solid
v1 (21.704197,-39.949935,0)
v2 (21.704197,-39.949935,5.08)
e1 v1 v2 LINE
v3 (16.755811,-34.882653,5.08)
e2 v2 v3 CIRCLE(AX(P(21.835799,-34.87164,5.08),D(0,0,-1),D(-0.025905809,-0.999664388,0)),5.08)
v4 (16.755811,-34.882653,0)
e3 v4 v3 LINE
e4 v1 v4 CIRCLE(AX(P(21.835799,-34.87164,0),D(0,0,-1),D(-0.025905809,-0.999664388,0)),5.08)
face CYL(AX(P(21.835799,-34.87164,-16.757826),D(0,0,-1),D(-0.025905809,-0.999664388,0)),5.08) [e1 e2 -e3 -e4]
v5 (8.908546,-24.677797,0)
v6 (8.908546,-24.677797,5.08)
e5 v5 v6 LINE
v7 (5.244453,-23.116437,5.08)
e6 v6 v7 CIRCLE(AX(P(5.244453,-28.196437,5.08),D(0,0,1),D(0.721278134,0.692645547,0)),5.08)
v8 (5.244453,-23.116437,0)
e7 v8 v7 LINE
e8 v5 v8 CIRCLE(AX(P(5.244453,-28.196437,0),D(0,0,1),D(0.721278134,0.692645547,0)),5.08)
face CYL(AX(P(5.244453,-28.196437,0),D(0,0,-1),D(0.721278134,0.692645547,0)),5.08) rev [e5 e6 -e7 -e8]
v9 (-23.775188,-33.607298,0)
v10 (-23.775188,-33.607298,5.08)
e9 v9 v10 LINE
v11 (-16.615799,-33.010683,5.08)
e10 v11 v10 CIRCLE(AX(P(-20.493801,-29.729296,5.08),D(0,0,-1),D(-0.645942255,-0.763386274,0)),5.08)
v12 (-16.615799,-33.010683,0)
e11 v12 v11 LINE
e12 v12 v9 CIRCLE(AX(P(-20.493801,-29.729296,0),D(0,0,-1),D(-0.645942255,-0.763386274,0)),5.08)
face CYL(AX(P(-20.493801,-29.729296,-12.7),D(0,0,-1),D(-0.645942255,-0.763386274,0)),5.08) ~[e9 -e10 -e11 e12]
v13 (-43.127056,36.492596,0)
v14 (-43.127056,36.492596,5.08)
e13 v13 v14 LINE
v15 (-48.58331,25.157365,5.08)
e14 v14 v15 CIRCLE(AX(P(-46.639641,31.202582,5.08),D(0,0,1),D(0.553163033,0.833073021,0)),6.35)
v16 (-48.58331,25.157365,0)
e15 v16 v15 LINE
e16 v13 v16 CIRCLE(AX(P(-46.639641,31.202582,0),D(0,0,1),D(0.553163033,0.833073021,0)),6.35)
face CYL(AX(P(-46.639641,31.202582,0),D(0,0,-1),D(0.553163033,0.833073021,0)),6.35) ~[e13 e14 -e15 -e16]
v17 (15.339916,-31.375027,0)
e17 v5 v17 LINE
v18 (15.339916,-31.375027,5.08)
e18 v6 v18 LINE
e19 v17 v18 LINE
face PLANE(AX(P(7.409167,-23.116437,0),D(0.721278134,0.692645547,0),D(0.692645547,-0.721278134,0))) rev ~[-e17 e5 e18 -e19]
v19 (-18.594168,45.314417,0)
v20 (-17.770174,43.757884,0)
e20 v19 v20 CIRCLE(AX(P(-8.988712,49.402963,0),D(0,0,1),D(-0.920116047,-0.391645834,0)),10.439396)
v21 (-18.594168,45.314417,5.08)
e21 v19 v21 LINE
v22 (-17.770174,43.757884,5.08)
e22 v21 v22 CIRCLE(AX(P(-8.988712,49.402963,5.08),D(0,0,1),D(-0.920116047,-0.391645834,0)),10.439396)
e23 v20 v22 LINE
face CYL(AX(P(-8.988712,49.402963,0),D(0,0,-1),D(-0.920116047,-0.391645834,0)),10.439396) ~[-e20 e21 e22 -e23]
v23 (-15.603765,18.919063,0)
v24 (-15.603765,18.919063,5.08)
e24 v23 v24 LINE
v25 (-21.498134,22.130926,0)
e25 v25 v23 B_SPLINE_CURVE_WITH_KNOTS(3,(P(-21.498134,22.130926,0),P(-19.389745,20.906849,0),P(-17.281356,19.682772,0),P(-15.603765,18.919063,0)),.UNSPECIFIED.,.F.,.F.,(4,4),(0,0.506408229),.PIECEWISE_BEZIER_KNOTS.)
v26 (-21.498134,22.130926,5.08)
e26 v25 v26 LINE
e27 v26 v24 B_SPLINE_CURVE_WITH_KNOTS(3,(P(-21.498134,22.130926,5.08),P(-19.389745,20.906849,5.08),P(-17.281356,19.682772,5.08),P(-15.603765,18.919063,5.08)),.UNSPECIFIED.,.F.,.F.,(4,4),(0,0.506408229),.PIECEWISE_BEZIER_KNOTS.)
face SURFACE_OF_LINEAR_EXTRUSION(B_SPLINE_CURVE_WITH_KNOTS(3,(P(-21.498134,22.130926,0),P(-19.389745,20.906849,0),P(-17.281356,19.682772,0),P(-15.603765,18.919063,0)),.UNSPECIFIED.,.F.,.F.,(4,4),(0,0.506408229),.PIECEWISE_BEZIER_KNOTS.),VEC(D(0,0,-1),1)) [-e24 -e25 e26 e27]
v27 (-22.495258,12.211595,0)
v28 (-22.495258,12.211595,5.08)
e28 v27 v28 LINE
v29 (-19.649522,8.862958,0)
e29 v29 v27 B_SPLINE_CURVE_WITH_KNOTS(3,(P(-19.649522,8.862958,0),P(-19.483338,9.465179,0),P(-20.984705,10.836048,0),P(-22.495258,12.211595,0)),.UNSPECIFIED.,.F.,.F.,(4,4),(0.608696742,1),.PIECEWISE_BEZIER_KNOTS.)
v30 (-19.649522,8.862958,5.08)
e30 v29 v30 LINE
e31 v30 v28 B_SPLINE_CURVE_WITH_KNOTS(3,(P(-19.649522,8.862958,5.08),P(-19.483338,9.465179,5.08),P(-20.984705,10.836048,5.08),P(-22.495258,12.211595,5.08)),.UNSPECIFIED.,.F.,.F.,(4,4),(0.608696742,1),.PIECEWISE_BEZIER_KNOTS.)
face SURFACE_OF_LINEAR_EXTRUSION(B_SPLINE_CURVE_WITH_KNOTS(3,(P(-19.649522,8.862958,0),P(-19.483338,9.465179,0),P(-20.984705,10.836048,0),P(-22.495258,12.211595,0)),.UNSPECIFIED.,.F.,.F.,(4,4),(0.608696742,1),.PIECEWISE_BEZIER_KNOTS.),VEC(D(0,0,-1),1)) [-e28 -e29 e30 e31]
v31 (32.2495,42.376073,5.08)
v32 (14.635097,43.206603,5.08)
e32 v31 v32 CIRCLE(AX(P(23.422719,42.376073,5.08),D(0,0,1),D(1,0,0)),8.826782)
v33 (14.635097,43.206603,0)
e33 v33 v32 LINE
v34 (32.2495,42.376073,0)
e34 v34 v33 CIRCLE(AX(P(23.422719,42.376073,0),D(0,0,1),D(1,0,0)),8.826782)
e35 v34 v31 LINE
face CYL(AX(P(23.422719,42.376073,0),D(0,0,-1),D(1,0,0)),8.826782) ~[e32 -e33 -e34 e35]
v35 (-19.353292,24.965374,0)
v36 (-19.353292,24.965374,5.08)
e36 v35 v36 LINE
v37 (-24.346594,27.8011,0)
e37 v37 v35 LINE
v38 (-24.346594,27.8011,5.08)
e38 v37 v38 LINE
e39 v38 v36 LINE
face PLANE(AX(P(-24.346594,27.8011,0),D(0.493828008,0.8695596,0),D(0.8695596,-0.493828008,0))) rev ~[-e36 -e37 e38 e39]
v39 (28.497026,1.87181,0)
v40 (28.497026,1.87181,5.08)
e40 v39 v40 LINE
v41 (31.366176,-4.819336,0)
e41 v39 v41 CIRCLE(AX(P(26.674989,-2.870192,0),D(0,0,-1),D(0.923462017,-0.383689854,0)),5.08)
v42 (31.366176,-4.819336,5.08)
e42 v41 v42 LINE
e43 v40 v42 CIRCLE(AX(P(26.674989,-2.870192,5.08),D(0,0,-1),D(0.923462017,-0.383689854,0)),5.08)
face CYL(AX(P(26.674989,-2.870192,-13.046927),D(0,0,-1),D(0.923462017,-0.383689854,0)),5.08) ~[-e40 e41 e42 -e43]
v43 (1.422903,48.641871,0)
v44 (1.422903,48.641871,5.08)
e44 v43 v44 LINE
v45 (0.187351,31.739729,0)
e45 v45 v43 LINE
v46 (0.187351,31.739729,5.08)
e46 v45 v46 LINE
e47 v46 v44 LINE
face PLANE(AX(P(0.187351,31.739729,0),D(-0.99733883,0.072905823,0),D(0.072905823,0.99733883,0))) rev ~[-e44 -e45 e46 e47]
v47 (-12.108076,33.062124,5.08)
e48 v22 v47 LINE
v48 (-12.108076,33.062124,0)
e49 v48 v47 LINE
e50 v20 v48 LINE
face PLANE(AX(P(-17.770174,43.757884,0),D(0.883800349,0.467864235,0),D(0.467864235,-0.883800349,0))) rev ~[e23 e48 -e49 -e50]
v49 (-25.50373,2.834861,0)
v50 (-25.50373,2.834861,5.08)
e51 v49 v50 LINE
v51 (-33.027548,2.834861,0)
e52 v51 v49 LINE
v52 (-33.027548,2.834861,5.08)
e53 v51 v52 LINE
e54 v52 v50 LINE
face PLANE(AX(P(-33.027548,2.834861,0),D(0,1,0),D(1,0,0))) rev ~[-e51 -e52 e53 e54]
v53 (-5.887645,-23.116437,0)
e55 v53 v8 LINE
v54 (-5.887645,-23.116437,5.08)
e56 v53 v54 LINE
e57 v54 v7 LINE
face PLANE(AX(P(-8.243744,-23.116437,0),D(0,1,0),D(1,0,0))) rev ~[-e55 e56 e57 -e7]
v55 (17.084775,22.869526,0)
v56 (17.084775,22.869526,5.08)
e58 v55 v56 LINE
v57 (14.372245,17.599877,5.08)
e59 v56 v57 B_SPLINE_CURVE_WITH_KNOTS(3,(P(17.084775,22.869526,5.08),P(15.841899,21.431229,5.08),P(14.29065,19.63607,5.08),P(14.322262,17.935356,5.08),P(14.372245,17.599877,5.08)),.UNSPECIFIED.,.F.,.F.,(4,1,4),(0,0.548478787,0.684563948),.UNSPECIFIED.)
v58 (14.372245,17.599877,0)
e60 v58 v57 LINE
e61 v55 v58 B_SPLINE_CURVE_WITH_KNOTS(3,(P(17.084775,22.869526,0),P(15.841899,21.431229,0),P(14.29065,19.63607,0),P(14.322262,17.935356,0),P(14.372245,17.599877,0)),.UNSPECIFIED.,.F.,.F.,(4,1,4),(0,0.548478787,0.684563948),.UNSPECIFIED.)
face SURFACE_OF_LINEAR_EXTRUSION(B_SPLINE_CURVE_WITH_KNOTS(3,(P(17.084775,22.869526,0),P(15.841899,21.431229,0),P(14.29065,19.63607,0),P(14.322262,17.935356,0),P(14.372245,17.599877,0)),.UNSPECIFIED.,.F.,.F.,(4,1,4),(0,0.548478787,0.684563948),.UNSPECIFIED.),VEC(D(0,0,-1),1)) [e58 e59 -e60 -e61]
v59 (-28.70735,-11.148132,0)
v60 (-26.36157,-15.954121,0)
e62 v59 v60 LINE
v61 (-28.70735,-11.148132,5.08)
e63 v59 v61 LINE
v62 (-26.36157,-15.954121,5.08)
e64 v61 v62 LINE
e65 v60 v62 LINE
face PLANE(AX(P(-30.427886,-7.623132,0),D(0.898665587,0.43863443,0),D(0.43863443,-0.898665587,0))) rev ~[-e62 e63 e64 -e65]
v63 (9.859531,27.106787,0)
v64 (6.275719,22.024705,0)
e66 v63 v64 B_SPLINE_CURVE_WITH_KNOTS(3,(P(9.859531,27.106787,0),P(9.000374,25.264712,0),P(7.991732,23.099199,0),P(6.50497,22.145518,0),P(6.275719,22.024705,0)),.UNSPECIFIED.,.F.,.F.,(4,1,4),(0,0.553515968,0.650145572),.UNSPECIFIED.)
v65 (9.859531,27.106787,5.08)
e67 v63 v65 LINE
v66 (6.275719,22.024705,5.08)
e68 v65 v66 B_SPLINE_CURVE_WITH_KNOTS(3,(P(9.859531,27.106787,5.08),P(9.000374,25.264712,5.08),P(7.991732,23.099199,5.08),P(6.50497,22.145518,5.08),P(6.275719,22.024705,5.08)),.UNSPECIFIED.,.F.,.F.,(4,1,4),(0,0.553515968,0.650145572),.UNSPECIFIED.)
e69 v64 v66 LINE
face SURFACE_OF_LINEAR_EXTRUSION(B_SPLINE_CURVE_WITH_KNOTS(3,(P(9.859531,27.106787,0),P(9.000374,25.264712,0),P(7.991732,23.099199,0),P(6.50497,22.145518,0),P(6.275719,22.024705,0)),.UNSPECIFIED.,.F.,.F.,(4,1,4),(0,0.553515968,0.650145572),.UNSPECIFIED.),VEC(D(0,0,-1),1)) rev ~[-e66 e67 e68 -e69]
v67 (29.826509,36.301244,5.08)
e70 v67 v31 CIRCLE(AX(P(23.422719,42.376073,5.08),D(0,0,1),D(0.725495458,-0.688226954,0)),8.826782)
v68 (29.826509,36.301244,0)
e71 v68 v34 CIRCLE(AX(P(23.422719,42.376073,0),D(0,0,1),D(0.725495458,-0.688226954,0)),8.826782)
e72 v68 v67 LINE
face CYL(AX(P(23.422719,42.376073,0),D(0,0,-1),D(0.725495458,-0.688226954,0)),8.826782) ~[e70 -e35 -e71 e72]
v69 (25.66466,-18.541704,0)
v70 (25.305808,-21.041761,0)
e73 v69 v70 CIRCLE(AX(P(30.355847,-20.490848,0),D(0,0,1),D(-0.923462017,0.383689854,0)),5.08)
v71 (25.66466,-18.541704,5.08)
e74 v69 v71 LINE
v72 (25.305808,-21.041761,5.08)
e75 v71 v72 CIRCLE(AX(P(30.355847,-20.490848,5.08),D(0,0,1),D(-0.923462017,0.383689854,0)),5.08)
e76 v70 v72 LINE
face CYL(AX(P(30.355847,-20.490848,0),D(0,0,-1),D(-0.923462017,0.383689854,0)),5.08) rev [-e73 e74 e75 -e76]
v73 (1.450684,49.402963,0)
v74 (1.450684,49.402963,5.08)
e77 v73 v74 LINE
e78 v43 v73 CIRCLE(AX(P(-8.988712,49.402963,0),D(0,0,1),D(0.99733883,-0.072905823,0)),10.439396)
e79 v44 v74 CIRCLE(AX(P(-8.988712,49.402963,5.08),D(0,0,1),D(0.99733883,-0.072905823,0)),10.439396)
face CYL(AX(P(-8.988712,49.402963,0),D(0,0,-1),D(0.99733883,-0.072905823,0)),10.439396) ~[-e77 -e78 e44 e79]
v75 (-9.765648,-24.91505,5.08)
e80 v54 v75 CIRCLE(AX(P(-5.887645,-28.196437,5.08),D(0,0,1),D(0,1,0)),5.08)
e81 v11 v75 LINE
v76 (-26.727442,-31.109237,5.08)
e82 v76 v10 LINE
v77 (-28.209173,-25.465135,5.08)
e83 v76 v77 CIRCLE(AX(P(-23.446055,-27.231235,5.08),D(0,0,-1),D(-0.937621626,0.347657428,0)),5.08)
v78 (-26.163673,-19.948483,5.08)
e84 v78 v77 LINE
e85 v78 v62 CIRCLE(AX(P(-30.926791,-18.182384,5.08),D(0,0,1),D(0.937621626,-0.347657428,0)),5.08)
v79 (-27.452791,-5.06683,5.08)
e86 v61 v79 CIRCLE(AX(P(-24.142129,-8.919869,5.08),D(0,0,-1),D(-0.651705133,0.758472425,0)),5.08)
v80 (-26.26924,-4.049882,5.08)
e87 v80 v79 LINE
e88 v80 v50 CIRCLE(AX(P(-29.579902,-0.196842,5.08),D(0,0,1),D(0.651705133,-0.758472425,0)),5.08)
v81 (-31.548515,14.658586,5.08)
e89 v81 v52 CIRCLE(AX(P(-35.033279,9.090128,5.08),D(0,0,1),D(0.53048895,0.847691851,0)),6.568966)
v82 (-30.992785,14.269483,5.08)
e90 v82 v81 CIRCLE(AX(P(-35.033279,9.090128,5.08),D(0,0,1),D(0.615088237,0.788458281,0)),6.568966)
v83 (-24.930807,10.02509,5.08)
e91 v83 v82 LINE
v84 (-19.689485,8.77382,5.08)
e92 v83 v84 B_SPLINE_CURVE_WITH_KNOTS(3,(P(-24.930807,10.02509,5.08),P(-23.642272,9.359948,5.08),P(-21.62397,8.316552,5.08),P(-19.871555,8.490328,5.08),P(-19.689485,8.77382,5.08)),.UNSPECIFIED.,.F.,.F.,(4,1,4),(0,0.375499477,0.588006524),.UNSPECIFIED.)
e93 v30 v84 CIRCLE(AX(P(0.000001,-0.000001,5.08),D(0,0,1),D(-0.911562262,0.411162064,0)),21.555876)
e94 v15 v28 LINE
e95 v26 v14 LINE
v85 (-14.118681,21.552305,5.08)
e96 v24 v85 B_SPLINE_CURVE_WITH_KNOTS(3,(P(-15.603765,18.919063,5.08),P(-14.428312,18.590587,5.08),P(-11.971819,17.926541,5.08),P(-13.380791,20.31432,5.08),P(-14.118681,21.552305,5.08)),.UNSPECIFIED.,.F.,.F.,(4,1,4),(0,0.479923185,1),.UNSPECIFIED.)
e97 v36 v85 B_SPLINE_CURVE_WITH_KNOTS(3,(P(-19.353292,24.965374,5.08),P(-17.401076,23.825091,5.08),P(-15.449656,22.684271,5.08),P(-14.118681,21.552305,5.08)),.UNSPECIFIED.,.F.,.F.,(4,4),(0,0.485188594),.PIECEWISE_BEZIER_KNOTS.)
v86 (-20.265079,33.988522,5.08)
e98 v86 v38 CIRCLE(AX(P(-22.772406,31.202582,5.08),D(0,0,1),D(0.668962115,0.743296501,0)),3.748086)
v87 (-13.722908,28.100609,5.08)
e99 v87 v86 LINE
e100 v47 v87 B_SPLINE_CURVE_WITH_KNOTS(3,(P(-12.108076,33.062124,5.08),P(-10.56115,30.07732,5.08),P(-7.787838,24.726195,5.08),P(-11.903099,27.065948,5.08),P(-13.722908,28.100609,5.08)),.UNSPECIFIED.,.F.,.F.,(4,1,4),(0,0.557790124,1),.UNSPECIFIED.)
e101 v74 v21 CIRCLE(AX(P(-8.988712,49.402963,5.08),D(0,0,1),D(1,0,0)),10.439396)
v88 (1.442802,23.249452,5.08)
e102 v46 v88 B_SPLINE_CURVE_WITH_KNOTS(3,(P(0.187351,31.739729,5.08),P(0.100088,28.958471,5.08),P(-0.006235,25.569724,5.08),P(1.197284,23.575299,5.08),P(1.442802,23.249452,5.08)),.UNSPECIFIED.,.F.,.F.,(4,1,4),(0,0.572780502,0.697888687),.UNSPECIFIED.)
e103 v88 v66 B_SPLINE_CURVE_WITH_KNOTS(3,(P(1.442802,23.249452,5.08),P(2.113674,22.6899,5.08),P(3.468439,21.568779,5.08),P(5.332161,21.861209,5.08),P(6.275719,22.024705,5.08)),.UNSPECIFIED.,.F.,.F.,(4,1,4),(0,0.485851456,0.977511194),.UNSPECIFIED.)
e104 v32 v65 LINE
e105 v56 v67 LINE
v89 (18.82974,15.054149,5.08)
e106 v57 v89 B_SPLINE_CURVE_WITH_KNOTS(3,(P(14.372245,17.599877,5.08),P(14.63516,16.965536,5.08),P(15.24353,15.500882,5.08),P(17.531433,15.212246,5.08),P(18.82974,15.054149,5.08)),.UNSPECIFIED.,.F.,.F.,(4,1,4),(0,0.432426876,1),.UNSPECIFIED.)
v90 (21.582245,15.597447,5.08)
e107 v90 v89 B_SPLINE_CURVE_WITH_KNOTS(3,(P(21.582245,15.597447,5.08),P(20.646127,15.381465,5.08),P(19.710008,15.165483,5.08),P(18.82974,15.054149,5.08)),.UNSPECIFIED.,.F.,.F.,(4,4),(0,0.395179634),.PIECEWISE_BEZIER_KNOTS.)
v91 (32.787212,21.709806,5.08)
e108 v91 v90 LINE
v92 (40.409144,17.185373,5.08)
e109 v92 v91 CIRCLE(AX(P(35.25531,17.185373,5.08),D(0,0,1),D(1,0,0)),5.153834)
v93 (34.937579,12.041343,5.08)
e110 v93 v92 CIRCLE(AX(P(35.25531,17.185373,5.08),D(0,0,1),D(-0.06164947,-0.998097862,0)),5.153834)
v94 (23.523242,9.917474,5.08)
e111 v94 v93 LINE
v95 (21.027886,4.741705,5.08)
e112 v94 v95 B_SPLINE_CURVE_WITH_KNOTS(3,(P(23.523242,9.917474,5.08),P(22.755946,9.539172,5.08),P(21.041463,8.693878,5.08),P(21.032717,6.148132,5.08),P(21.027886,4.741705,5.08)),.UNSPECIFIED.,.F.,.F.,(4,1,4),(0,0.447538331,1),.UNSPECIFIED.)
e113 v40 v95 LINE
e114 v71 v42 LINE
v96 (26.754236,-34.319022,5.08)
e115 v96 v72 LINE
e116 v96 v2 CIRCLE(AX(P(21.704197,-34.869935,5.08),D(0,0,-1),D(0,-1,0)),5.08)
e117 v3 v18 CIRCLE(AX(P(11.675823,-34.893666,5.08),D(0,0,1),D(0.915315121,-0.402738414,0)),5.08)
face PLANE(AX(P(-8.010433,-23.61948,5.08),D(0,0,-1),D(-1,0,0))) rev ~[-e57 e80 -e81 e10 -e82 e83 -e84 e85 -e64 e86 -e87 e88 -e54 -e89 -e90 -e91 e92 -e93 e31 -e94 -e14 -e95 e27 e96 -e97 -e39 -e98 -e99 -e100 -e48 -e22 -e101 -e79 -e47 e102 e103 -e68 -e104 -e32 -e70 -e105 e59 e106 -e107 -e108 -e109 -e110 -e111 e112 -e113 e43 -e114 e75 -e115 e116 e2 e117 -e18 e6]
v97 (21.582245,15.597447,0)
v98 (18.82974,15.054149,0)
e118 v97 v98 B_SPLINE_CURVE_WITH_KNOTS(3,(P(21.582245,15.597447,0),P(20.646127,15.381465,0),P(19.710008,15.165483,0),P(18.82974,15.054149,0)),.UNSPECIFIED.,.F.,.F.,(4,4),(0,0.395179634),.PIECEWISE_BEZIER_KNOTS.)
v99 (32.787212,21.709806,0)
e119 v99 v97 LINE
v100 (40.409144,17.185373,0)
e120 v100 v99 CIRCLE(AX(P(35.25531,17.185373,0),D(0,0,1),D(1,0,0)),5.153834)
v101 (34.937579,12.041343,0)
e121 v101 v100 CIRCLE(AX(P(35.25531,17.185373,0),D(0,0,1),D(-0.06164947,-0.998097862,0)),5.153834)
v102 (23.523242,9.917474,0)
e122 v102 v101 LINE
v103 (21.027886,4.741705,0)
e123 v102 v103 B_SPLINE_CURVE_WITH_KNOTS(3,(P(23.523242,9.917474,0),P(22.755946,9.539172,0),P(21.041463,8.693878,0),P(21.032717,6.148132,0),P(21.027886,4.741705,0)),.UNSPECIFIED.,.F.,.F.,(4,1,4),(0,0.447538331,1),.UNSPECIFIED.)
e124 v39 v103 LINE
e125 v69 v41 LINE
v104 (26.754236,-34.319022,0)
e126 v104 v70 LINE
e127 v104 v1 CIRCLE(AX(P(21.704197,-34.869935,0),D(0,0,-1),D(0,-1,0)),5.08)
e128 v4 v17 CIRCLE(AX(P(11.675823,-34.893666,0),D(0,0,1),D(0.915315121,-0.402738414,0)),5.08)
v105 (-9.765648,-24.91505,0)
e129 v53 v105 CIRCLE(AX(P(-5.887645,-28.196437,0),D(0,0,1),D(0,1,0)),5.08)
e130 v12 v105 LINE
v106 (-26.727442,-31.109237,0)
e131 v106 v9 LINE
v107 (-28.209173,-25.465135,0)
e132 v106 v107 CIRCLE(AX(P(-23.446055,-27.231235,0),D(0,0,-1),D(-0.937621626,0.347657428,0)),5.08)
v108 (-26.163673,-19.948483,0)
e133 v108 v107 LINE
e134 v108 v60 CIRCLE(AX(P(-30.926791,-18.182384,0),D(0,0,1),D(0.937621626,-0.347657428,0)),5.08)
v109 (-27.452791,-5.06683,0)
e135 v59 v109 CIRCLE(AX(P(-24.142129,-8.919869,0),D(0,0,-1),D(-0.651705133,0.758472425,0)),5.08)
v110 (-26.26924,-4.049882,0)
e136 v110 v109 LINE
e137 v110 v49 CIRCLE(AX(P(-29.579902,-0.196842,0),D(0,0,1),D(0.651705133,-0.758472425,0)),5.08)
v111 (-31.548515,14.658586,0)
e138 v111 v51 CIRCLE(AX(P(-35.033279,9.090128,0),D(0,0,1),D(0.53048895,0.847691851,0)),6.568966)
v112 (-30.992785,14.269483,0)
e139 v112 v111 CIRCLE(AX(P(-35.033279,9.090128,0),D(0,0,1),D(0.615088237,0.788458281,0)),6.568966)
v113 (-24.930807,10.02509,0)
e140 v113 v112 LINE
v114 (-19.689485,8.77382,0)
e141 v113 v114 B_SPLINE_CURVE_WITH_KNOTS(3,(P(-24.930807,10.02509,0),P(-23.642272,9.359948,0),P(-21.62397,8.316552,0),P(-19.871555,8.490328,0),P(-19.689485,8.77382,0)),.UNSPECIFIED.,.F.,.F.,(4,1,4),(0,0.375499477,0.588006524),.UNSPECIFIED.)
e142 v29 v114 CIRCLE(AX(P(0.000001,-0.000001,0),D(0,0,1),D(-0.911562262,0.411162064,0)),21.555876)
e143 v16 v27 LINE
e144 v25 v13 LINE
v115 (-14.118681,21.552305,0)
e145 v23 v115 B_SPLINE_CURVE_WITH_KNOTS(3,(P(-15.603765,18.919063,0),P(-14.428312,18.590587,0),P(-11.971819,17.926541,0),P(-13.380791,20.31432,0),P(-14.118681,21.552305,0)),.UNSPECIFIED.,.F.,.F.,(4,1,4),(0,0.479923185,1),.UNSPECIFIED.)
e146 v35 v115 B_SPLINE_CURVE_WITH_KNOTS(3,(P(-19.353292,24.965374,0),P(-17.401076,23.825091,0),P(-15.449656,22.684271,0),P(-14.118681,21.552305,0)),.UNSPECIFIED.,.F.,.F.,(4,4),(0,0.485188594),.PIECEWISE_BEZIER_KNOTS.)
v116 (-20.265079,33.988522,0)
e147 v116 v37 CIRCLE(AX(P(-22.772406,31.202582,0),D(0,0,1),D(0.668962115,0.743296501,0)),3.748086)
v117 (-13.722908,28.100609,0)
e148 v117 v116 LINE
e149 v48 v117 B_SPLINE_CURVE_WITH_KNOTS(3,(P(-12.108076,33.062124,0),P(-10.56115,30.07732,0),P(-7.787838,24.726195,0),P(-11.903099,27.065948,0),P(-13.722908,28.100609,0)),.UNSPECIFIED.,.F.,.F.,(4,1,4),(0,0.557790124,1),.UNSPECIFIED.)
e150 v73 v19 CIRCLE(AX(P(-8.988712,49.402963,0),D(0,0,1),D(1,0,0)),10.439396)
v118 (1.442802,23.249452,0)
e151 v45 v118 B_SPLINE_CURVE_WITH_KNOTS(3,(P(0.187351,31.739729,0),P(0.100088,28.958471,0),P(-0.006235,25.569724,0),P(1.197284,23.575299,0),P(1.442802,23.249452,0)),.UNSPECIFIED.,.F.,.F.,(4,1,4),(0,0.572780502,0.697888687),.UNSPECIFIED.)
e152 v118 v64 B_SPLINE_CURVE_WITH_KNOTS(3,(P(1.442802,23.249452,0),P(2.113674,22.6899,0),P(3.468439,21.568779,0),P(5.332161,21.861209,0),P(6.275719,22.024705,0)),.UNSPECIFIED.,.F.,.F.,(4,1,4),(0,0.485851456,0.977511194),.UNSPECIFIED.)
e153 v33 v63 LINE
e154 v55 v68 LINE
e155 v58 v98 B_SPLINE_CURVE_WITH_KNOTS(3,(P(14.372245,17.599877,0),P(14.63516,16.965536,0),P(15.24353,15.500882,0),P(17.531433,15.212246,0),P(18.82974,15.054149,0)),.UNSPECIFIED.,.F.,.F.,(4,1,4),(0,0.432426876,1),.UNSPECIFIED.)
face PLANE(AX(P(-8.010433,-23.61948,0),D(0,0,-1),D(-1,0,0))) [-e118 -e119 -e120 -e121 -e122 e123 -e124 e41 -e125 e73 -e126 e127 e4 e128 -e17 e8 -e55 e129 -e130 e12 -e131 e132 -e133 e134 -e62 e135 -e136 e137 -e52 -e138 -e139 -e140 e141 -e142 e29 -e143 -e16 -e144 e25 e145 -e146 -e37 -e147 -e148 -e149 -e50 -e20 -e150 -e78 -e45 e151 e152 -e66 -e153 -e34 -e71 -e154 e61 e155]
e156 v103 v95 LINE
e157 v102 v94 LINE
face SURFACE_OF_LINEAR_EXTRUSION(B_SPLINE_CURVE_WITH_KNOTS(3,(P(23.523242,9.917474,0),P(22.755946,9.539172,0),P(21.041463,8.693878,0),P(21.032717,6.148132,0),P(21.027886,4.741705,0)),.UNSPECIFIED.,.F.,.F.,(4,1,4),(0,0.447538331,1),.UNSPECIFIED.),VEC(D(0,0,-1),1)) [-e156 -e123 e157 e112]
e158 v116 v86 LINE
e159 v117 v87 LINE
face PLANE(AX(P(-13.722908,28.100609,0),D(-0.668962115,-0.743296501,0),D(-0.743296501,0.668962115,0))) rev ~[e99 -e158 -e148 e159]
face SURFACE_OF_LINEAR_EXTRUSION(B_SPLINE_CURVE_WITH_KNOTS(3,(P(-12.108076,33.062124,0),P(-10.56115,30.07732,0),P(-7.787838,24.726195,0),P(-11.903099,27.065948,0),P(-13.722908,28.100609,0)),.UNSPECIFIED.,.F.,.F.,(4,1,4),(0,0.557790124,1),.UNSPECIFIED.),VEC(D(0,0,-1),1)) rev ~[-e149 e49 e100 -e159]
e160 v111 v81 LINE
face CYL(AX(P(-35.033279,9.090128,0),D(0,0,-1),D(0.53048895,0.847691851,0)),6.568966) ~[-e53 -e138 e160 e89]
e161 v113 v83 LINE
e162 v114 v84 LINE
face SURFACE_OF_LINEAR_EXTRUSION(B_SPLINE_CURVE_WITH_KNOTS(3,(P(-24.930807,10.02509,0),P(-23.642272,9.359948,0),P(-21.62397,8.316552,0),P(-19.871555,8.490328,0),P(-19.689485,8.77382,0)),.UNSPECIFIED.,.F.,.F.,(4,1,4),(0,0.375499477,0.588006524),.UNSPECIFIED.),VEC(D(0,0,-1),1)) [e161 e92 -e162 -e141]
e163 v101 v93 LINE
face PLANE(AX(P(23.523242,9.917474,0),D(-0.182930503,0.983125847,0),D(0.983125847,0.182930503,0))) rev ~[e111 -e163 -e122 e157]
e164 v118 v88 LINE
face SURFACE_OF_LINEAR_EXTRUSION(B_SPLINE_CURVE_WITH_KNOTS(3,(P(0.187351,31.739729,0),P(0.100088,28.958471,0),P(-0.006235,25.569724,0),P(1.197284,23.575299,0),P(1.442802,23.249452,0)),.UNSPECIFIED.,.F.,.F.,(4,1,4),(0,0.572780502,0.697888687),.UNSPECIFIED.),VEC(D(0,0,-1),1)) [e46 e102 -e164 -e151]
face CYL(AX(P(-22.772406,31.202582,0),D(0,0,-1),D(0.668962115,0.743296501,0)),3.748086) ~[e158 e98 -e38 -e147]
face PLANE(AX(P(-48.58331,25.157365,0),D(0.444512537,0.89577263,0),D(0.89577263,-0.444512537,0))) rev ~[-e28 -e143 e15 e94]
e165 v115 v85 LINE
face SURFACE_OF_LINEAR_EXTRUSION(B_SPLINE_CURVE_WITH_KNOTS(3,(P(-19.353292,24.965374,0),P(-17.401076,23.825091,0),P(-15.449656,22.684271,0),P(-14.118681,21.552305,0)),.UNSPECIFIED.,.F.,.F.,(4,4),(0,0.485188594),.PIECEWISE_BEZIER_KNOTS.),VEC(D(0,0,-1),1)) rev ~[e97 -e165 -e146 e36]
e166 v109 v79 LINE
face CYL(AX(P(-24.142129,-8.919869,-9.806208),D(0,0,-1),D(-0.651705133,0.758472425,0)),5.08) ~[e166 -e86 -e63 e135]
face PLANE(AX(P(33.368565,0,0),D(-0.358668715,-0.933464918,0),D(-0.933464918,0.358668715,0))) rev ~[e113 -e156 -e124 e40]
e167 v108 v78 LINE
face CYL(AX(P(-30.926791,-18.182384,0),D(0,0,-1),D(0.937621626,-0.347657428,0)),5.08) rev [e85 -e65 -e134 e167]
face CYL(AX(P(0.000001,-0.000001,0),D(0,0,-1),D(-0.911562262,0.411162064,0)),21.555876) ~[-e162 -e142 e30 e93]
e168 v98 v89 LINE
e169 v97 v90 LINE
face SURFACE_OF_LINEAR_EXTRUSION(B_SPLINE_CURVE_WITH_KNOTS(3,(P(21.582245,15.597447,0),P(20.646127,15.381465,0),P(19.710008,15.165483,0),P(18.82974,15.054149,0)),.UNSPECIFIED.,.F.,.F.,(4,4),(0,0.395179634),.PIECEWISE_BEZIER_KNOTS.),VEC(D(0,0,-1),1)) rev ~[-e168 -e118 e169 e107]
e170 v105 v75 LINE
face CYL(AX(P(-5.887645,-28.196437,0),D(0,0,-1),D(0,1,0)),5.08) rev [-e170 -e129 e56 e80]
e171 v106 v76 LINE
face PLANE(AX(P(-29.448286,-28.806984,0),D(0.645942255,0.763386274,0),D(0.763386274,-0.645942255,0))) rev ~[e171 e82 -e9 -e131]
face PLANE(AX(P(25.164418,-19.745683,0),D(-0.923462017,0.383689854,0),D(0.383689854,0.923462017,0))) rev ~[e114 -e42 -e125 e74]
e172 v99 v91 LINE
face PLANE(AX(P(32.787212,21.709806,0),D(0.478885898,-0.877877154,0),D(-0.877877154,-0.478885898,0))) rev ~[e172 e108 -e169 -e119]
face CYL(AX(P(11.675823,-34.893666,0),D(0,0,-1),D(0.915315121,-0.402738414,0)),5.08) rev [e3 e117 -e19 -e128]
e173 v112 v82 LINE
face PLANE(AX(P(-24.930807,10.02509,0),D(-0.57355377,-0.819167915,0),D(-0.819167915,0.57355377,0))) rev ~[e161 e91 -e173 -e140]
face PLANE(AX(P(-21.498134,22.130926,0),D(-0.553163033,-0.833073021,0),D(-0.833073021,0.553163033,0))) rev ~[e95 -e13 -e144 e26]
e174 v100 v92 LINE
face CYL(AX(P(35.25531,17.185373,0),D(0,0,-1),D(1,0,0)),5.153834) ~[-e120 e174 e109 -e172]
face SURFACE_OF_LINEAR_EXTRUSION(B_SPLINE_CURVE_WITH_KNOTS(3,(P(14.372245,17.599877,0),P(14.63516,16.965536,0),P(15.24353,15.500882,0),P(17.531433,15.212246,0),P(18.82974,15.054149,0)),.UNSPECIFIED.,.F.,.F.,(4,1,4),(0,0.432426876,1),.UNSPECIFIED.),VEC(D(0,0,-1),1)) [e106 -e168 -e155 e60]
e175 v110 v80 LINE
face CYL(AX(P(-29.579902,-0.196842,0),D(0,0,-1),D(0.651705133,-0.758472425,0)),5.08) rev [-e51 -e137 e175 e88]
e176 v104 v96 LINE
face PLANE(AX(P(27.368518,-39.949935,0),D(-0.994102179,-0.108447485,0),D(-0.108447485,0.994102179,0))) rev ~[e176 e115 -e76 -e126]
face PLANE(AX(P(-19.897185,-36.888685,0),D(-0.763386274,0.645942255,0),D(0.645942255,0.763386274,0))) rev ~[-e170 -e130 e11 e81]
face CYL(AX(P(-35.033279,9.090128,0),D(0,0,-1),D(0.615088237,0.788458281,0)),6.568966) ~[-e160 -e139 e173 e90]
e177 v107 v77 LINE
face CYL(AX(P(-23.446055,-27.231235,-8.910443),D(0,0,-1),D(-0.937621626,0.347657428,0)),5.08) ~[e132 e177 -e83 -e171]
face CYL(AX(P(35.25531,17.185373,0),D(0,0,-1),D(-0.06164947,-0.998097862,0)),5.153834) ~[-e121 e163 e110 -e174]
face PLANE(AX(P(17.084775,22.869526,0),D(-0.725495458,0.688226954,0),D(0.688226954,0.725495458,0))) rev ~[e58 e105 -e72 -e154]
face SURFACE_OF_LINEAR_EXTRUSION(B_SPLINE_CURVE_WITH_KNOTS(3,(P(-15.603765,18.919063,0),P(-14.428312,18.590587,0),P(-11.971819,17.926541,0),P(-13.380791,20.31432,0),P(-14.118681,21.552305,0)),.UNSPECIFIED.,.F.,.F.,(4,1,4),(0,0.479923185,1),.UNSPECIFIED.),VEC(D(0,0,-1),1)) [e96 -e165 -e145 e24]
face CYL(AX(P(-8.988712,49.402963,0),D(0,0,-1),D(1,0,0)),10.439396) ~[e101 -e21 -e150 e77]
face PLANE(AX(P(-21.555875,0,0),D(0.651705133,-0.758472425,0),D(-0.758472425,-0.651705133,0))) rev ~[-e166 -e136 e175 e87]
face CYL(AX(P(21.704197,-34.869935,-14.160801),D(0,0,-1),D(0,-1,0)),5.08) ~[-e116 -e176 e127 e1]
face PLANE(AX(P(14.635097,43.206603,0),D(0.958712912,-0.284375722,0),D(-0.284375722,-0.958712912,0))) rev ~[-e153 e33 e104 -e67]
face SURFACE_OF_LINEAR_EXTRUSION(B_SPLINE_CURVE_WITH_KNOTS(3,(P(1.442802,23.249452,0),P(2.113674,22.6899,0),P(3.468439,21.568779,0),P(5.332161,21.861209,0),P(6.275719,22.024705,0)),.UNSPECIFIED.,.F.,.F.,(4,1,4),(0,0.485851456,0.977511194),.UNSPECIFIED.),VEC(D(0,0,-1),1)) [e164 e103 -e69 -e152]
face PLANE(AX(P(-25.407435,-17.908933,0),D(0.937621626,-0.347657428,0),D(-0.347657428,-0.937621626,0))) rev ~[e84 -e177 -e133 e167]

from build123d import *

# Parameters (mm, degrees)
F1_DEPTH     = 5.08
F2_T1_DEPTH  = 30.48
F2_T3_DEPTH  = 33.4016018607
F2_T5_DEPTH  = 31.1738532926
F2_T7_DEPTH  = 22.9008851429
F2_T9_DEPTH  = 24.6924150926
F2_T11_DEPTH = 5.08
F3_T1_DEPTH  = 38.5956513


# Not quite as in the source:
# - a fillet or chamfer that OpenCascade refuses, or shapes differently, is made with other operations: its cross-section is extruded or revolved along the edge and cut away or added


with BuildPart() as f1:
    # F0 (on Top) → F1 (new body)
    with BuildSketch(Plane.XY):
        with BuildLine():
            ThreePointArc((-21.5558748819, 0), (0, -21.5558748819), (21.5558748819, 0))
            ThreePointArc((21.5558748819, 0), (21.4234709168, 2.3855053553), (21.0278855675, 4.7417054405))
            ThreePointArc((21.0278855675, 4.7417054405), (20.3885232844, 6.9974181101), (19.5079583491, 9.1703491196))
            ThreePointArc((19.5079583491, 9.1703491196), (18.4039292813, 11.2227950589), (17.0847745632, 13.1440564533))
            ThreePointArc((17.0847745632, 13.1440564533), (16.1728801059, 14.2510943792), (15.1893864462, 15.2950410693))
            ThreePointArc((15.1893864462, 15.2950410693), (13.7642148433, 16.5892173315), (12.2292624666, 17.7510811346))
            ThreePointArc((12.2292624666, 17.7510811346), (10.0743632522, 19.0568346529), (7.7818181976, 20.102214989))
            ThreePointArc((7.7818181976, 20.102214989), (5.7045723263, 20.7873422182), (3.5685890575, 21.2584315993))
            ThreePointArc((3.5685890575, 21.2584315993), (1.5124623044, 21.5027486546), (-0.5576198391, 21.5486612586))
            ThreePointArc((-0.5576198391, 21.5486612586), (-3.1118074322, 21.3300819602), (-5.6219845653, 20.8098301644))
            Line((-5.6219845653, 20.8098301644), (-9.4810400544, 19.3588641561))
            ThreePointArc((-9.4810400544, 19.3588641561), (-10.7139746116, 18.7047183872), (-11.9019916348, 17.972154491))
            ThreePointArc((-11.9019916348, 17.972154491), (-12.7090282155, 17.4108111167), (-13.489631919, 16.81325586))
            Line((-13.489631919, 16.81325586), (-18.8732484452, 10.4142323313))
            ThreePointArc((-18.8732484452, 10.4142323313), (-19.2769960016, 9.6464069518), (-19.6495220596, 8.8629580138))
            add(Edge.make_bspline(
                [(-19.689484951, 8.773820393), (-19.671758168, 8.8014219328), (-19.6583090598, 8.8311154874), (-19.6495220596, 8.8629580138)],
                knots=[0.5880065236, 0.5880065236, 0.5880065236, 0.5880065236, 0.6086967417, 0.6086967417, 0.6086967417, 0.6086967417], degree=3))
            ThreePointArc((-19.689484951, 8.773820393), (-20.0824369178, 7.8327178788), (-20.4304363673, 6.8740826127))
            ThreePointArc((-20.4304363673, 6.8740826127), (-20.9968993757, 4.8770850443), (-21.3686524004, 2.834860934))
            ThreePointArc((-21.3686524004, 2.834860934), (-21.5090183349, 1.4205182833), (-21.5558748819, 0))
        make_face()
        with BuildLine():
            ThreePointArc((21.0278855675, 4.7417054405), (21.4234709168, 2.3855053553), (21.5558748819, 0))
            ThreePointArc((21.5558748819, 0), (0, -21.5558748819), (-21.5558748819, 0))
            Line((-21.5558748819, 0), (-30.4278861731, -7.6231318526))
            Line((-30.4278861731, -7.6231318526), (-25.4074353725, -17.9089326411))
            Line((-25.4074353725, -17.9089326411), (-29.4482856989, -28.8069844246))
            Line((-29.4482856989, -28.8069844246), (-19.897185266, -36.8886850774))
            Line((-19.897185266, -36.8886850774), (-8.2437438999, -23.1164366785))
            Line((-8.2437438999, -23.1164366785), (7.4091665447, -23.1164366785))
            Line((7.4091665447, -23.1164366785), (17.6949668676, -33.8274315))
            Line((17.6949668676, -33.8274315), (15.0010669604, -39.9499349296))
            Line((15.0010669604, -39.9499349296), (27.3685175925, -39.9499349296))
            Line((27.3685175925, -39.9499349296), (25.1644179225, -19.7456832975))
            Line((25.1644179225, -19.7456832975), (33.3685651422, 0))
            Line((33.3685651422, 0), (21.0278855675, 4.7417054405))
        make_face()
        with BuildLine():
            ThreePointArc((19.5079583491, 9.1703491196), (20.3885232844, 6.9974181101), (21.0278855675, 4.7417054405))
            add(Edge.make_bspline(
                [(23.5232420106, 9.9174740822), (22.7559455678, 9.5391724766), (21.0414634986, 8.6938781634), (21.0327174333, 6.1481323969), (21.0278855675, 4.7417054405)],
                knots=[0, 0, 0, 0, 0.4475383305, 1, 1, 1, 1], degree=3))
            Line((23.5232420106, 9.9174740822), (19.5079583491, 9.1703491196))
        make_face()
        with BuildLine():
            add(Edge.make_bspline(
                [(-25.5037302423, 2.834860934), (-24.5160973645, 2.5129693408), (-22.6879107249, 1.9171225202), (-21.9124239812, 0.6038221422), (-21.5558748819, 0)],
                knots=[0, 0, 0, 0, 0.5402254105, 1, 1, 1, 1], degree=3))
            ThreePointArc((-21.5558748819, 0), (-21.5090183349, 1.4205182833), (-21.3686524004, 2.834860934))
            Line((-21.3686524004, 2.834860934), (-25.5037302423, 2.834860934))
        make_face()
        with BuildLine():
            ThreePointArc((17.0847745632, 13.1440564533), (18.4039292813, 11.2227950589), (19.5079583491, 9.1703491196))
            Line((19.5079583491, 9.1703491196), (23.5232420106, 9.9174740822))
            Line((23.5232420106, 9.9174740822), (34.937579099, 12.0413430014))
            ThreePointArc((34.937579099, 12.0413430014), (30.2244051694, 16.0664474688), (32.7872119933, 21.7098060121))
            Line((32.7872119933, 21.7098060121), (21.5822452322, 15.5974467356))
            Line((21.5822452322, 15.5974467356), (21.0278855675, 15.2950410693))
            Line((21.0278855675, 15.2950410693), (17.0847745632, 13.1440564533))
        make_face()
        with BuildLine():
            Line((-25.5037302423, 2.834860934), (-21.3686524004, 2.834860934))
            ThreePointArc((-21.3686524004, 2.834860934), (-20.9968993757, 4.8770850443), (-20.4304363673, 6.8740826127))
            Line((-20.4304363673, 6.8740826127), (-24.9308068167, 10.0250903474))
            Line((-24.9308068167, 10.0250903474), (-30.9927849426, 14.269483154))
            ThreePointArc((-30.9927849426, 14.269483154), (-29.1301786272, 11.9719193672), (-28.4643126696, 9.0901275345))
            ThreePointArc((-28.4643126696, 9.0901275345), (-29.7263545066, 5.2187104583), (-33.0275484153, 2.834860934))
            Line((-33.0275484153, 2.834860934), (-25.5037302423, 2.834860934))
        make_face()
        with BuildLine():
            ThreePointArc((15.1893864462, 15.2950410693), (16.1728801059, 14.2510943792), (17.0847745632, 13.1440564533))
            Line((17.0847745632, 13.1440564533), (21.0278855675, 15.2950410693))
            Line((21.0278855675, 15.2950410693), (21.5822452322, 15.5974467356))
            add(Edge.make_bspline(
                [(21.5822452322, 15.5974467356), (20.6461265257, 15.3814646696), (19.7100078192, 15.1654826036), (18.8297399827, 15.0541492613)],
                knots=[0, 0, 0, 0, 0.3951796339, 0.3951796339, 0.3951796339, 0.3951796339], degree=3))
            add(Edge.make_bspline(
                [(18.8297399827, 15.0541492613), (18.5066864561, 15.0132905279), (17.1908116294, 14.9016748686), (16.0537750645, 15.1251514978), (15.1893864462, 15.2950410693)],
                knots=[0.3951796339, 0.3951796339, 0.3951796339, 0.3951796339, 0.5402084184, 1, 1, 1, 1], degree=3))
        make_face()
        with BuildLine():
            ThreePointArc((32.7872119933, 21.7098060121), (30.2244051694, 16.0664474688), (34.937579099, 12.0413430014))
            ThreePointArc((34.937579099, 12.0413430014), (38.7854990971, 13.4304076429), (40.4091437753, 17.1853732684))
            ThreePointArc((40.4091437753, 17.1853732684), (37.8860736917, 21.6171995213), (32.7872119933, 21.7098060121))
        make_face()
        with BuildLine():
            Line((-24.9308068167, 10.0250903474), (-20.4304363673, 6.8740826127))
            ThreePointArc((-20.4304363673, 6.8740826127), (-20.0824369178, 7.8327178788), (-19.689484951, 8.773820393))
            add(Edge.make_bspline(
                [(-24.9308068167, 10.0250903474), (-23.6422724453, 9.3599481679), (-21.6239700291, 8.3165515966), (-19.8715548677, 8.4903278918), (-19.689484951, 8.773820393)],
                knots=[0, 0, 0, 0, 0.3754994773, 0.5880065236, 0.5880065236, 0.5880065236, 0.5880065236], degree=3))
        make_face()
        with BuildLine():
            ThreePointArc((-31.5485147848, 14.6585864624), (-41.5514457727, 9.9054871575), (-33.0275484153, 2.834860934))
            ThreePointArc((-33.0275484153, 2.834860934), (-29.7263545066, 5.2187104583), (-28.4643126696, 9.0901275345))
            ThreePointArc((-28.4643126696, 9.0901275345), (-29.1301786272, 11.9719193672), (-30.9927849426, 14.269483154))
            Line((-30.9927849426, 14.269483154), (-31.5485147848, 14.6585864624))
        make_face()
        with BuildLine():
            add(Edge.make_bspline(
                [(14.372244753, 17.5998769298), (14.4881018562, 16.8222590075), (14.8387441512, 16.0586500384), (15.1893864462, 15.2950410693)],
                knots=[0.6845639483, 0.6845639483, 0.6845639483, 0.6845639483, 1, 1, 1, 1], degree=3))
            add(Edge.make_bspline(
                [(18.8297399827, 15.0541492613), (18.5066864561, 15.0132905279), (17.1908116294, 14.9016748686), (16.0537750645, 15.1251514978), (15.1893864462, 15.2950410693)],
                knots=[0.3951796339, 0.3951796339, 0.3951796339, 0.3951796339, 0.5402084184, 1, 1, 1, 1], degree=3))
            add(Edge.make_bspline(
                [(14.372244753, 17.5998769298), (14.6351603968, 16.9655355449), (15.2435298304, 15.5008816531), (17.5314333381, 15.2122461299), (18.8297399827, 15.0541492613)],
                knots=[0, 0, 0, 0, 0.4324268759, 1, 1, 1, 1], degree=3))
        make_face()
        with BuildLine():
            ThreePointArc((12.2292624666, 17.7510811346), (13.7642148433, 16.5892173315), (15.1893864462, 15.2950410693))
            add(Edge.make_bspline(
                [(14.372244753, 17.5998769298), (14.4881018562, 16.8222590075), (14.8387441512, 16.0586500384), (15.1893864462, 15.2950410693)],
                knots=[0.6845639483, 0.6845639483, 0.6845639483, 0.6845639483, 1, 1, 1, 1], degree=3))
            add(Edge.make_bspline(
                [(17.0847745632, 22.8695263715), (15.8418994446, 21.4312290193), (14.2906498457, 19.6360702318), (14.3222617771, 17.9353562123), (14.372244753, 17.5998769298)],
                knots=[0, 0, 0, 0, 0.548478787, 0.6845639483, 0.6845639483, 0.6845639483, 0.6845639483], degree=3))
            Line((17.0847745632, 22.8695263715), (12.2292624666, 17.7510811346))
        make_face()
        with BuildLine():
            ThreePointArc((-19.6495220596, 8.8629580138), (-19.6695539991, 8.8184118412), (-19.689484951, 8.773820393))
            add(Edge.make_bspline(
                [(-19.689484951, 8.773820393), (-19.671758168, 8.8014219328), (-19.6583090598, 8.8311154874), (-19.6495220596, 8.8629580138)],
                knots=[0.5880065236, 0.5880065236, 0.5880065236, 0.5880065236, 0.6086967417, 0.6086967417, 0.6086967417, 0.6086967417], degree=3))
        make_face()
        with BuildLine():
            ThreePointArc((-30.9927849426, 14.269483154), (-31.2656234469, 14.4712136982), (-31.5485147848, 14.6585864624))
            Line((-31.5485147848, 14.6585864624), (-30.9927849426, 14.269483154))
        make_face()
        with BuildLine():
            ThreePointArc((7.7818181976, 20.102214989), (10.0743632522, 19.0568346529), (12.2292624666, 17.7510811346))
            Line((12.2292624666, 17.7510811346), (17.0847745632, 22.8695263715))
            Line((17.0847745632, 22.8695263715), (29.8265086684, 36.3012441684))
            ThreePointArc((29.8265086684, 36.3012441684), (19.7700953097, 34.3405012918), (14.6350970936, 43.2066027795))
            Line((14.6350970936, 43.2066027795), (9.8595311749, 27.1067871176))
            Line((9.8595311749, 27.1067871176), (7.7818181976, 20.102214989))
        make_face()
        with BuildLine():
            add(Edge.make_bspline(
                [(-19.6495220596, 8.8629580138), (-19.4833381268, 9.4651790358), (-20.9847051533, 10.8360480358), (-22.495258138, 12.2115954812)],
                knots=[0.6086967417, 0.6086967417, 0.6086967417, 0.6086967417, 1, 1, 1, 1], degree=3))
            ThreePointArc((-19.6495220596, 8.8629580138), (-19.2769960016, 9.6464069518), (-18.8732484452, 10.4142323313))
            Line((-18.8732484452, 10.4142323313), (-22.495258138, 12.2115954812))
        make_face()
        with BuildLine():
            ThreePointArc((3.5685890575, 21.2584315993), (5.7045723263, 20.7873422182), (7.7818181976, 20.102214989))
            Line((7.7818181976, 20.102214989), (9.8595311749, 27.1067871176))
            add(Edge.make_bspline(
                [(9.8595311749, 27.1067871176), (9.0003739191, 25.2647119406), (7.9917320333, 23.0991990151), (6.5049700197, 22.1455177099), (6.2757189942, 22.0247046239)],
                knots=[0, 0, 0, 0, 0.553515968, 0.6501455724, 0.6501455724, 0.6501455724, 0.6501455724], degree=3))
            add(Edge.make_bspline(
                [(6.2757189942, 22.0247046239), (5.4456991801, 21.5872921634), (4.5071787847, 21.424245643), (3.5685890575, 21.2584315993)],
                knots=[0.6501455724, 0.6501455724, 0.6501455724, 0.6501455724, 1, 1, 1, 1], degree=3))
        make_face()
        with BuildLine():
            Line((-22.495258138, 12.2115954812), (-18.8732484452, 10.4142323313))
            ThreePointArc((-18.8732484452, 10.4142323313), (-16.49472285, 13.8773145827), (-13.489631919, 16.81325586))
            Line((-13.489631919, 16.81325586), (-21.4981341047, 22.1309257933))
            Line((-21.4981341047, 22.1309257933), (-43.1270560205, 36.4925960649))
            ThreePointArc((-43.1270560205, 36.4925960649), (-41.0437760026, 34.2040473217), (-40.2896412796, 31.2025823789))
            ThreePointArc((-40.2896412796, 31.2025823789), (-42.8993068164, 26.0710720648), (-48.5833099737, 25.1573650952))
            Line((-48.5833099737, 25.1573650952), (-22.495258138, 12.2115954812))
        make_face()
        with BuildLine():
            add(Edge.make_bspline(
                [(1.4428020951, 23.2494519066), (2.0356785994, 22.4625958954), (2.8021338285, 21.8605137474), (3.5685890575, 21.2584315993)],
                knots=[0.6978886874, 0.6978886874, 0.6978886874, 0.6978886874, 1, 1, 1, 1], degree=3))
            add(Edge.make_bspline(
                [(6.2757189942, 22.0247046239), (5.4456991801, 21.5872921634), (4.5071787847, 21.424245643), (3.5685890575, 21.2584315993)],
                knots=[0.6501455724, 0.6501455724, 0.6501455724, 0.6501455724, 1, 1, 1, 1], degree=3))
            add(Edge.make_bspline(
                [(1.4428020951, 23.2494519066), (2.1136741264, 22.6899001143), (3.4684392223, 21.5687785752), (5.3321614448, 21.8612087878), (6.2757189942, 22.0247046239)],
                knots=[0, 0, 0, 0, 0.4858514557, 0.9775111942, 0.9775111942, 0.9775111942, 0.9775111942], degree=3))
        make_face()
        with BuildLine():
            ThreePointArc((-0.5576198391, 21.5486612586), (1.5124623044, 21.5027486546), (3.5685890575, 21.2584315993))
            add(Edge.make_bspline(
                [(1.4428020951, 23.2494519066), (2.0356785994, 22.4625958954), (2.8021338285, 21.8605137474), (3.5685890575, 21.2584315993)],
                knots=[0.6978886874, 0.6978886874, 0.6978886874, 0.6978886874, 1, 1, 1, 1], degree=3))
            add(Edge.make_bspline(
                [(0.1873508122, 31.7397286266), (0.1000880741, 28.9584711756), (-0.0062348151, 25.5697243407), (1.1972842983, 23.5752991157), (1.4428020951, 23.2494519066)],
                knots=[0, 0, 0, 0, 0.5727805016, 0.6978886874, 0.6978886874, 0.6978886874, 0.6978886874], degree=3))
            Line((0.1873508122, 31.7397286266), (-0.5576198391, 21.5486612586))
        make_face()
        with BuildLine():
            ThreePointArc((14.6350970936, 43.2066027795), (19.7700953097, 34.3405012918), (29.8265086684, 36.3012441684))
            ThreePointArc((29.8265086684, 36.3012441684), (31.6214054529, 39.1059647688), (32.2495003028, 42.3760731726))
            ThreePointArc((32.2495003028, 42.3760731726), (23.8384448664, 51.1930593335), (14.6350970936, 43.2066027795))
        make_face()
        with BuildLine():
            Line((-21.4981341047, 22.1309257933), (-13.489631919, 16.81325586))
            ThreePointArc((-13.489631919, 16.81325586), (-12.7090282155, 17.4108111167), (-11.9019916348, 17.972154491))
            add(Edge.make_bspline(
                [(-15.6037653952, 18.9190625193), (-15.1517196516, 18.7132722351), (-13.629732374, 18.0898022553), (-12.6272962109, 18.0215429553), (-11.9019916348, 17.972154491)],
                knots=[0.5064082285, 0.5064082285, 0.5064082285, 0.5064082285, 0.6428656669, 1, 1, 1, 1], degree=3))
            add(Edge.make_bspline(
                [(-21.4981341047, 22.1309257933), (-19.3897449339, 20.9068490942), (-17.2813557631, 19.682772395), (-15.6037653952, 18.9190625193)],
                knots=[0, 0, 0, 0, 0.5064082285, 0.5064082285, 0.5064082285, 0.5064082285], degree=3))
        make_face()
        with BuildLine():
            ThreePointArc((-43.1270560205, 36.4925960649), (-52.3612879028, 33.9567174372), (-48.5833099737, 25.1573650952))
            ThreePointArc((-48.5833099737, 25.1573650952), (-42.8993068164, 26.0710720648), (-40.2896412796, 31.2025823789))
            ThreePointArc((-40.2896412796, 31.2025823789), (-41.0437760026, 34.2040473217), (-43.1270560205, 36.4925960649))
        make_face()
        with BuildLine():
            ThreePointArc((-5.6219845653, 20.8098301644), (-3.1118074322, 21.3300819602), (-0.5576198391, 21.5486612586))
            Line((-0.5576198391, 21.5486612586), (0.1873508122, 31.7397286266))
            Line((0.1873508122, 31.7397286266), (1.4229034066, 48.6418706156))
            ThreePointArc((1.4229034066, 48.6418706156), (-6.4142835546, 39.2859820381), (-17.7701736912, 43.7578842893))
            Line((-17.7701736912, 43.7578842893), (-12.108076115, 33.0621237696))
            Line((-12.108076115, 33.0621237696), (-5.6219845653, 20.8098301644))
        make_face()
        with BuildLine():
            add(Edge.make_bspline(
                [(-14.1186807086, 21.5523049049), (-13.7674127143, 21.2535588061), (-12.528919888, 20.0549599754), (-12.1730615765, 18.869117359), (-11.9019916348, 17.972154491)],
                knots=[0.4851885937, 0.4851885937, 0.4851885937, 0.4851885937, 0.6132384939, 1, 1, 1, 1], degree=3))
            ThreePointArc((-11.9019916348, 17.972154491), (-10.7139746116, 18.7047183872), (-9.4810400544, 19.3588641561))
            Line((-9.4810400544, 19.3588641561), (-19.3532919722, 24.9653740527))
            add(Edge.make_bspline(
                [(-19.3532919722, 24.9653740527), (-17.4010758423, 23.8250906074), (-15.4496557731, 22.6842714218), (-14.1186807086, 21.5523049049)],
                knots=[0, 0, 0, 0, 0.4851885937, 0.4851885937, 0.4851885937, 0.4851885937], degree=3))
        make_face()
        with BuildLine():
            add(Edge.make_bspline(
                [(-15.6037653952, 18.9190625193), (-15.1517196516, 18.7132722351), (-13.629732374, 18.0898022553), (-12.6272962109, 18.0215429553), (-11.9019916348, 17.972154491)],
                knots=[0.5064082285, 0.5064082285, 0.5064082285, 0.5064082285, 0.6428656669, 1, 1, 1, 1], degree=3))
            add(Edge.make_bspline(
                [(-14.1186807086, 21.5523049049), (-13.7674127143, 21.2535588061), (-12.528919888, 20.0549599754), (-12.1730615765, 18.869117359), (-11.9019916348, 17.972154491)],
                knots=[0.4851885937, 0.4851885937, 0.4851885937, 0.4851885937, 0.6132384939, 1, 1, 1, 1], degree=3))
            add(Edge.make_bspline(
                [(-15.6037653952, 18.9190625193), (-14.4283120532, 18.5905868682), (-11.9718187149, 17.9265406092), (-13.3807906918, 20.3143200715), (-14.1186807086, 21.5523049049)],
                knots=[0, 0, 0, 0, 0.4799231847, 1, 1, 1, 1], degree=3))
        make_face()
        with BuildLine():
            ThreePointArc((-9.4810400544, 19.3588641561), (-7.5862812863, 20.1768203186), (-5.6219845653, 20.8098301644))
            Line((-5.6219845653, 20.8098301644), (-13.7229076454, 28.1006093155))
            Line((-13.7229076454, 28.1006093155), (-20.2650786975, 33.9885215741))
            ThreePointArc((-20.2650786975, 33.9885215741), (-19.348532067, 32.7274543218), (-19.0243201626, 31.2025822021))
            ThreePointArc((-19.0243201626, 31.2025822021), (-20.7539962478, 28.0443911329), (-24.3465941192, 27.8010996944))
            Line((-24.3465941192, 27.8010996944), (-19.3532919722, 24.9653740527))
            Line((-19.3532919722, 24.9653740527), (-9.4810400544, 19.3588641561))
        make_face()
        with BuildLine():
            Line((-13.7229076454, 28.1006093155), (-5.6219845653, 20.8098301644))
            Line((-5.6219845653, 20.8098301644), (-12.108076115, 33.0621237696))
            add(Edge.make_bspline(
                [(-12.108076115, 33.0621237696), (-10.5611501023, 30.0773195503), (-7.7878381604, 24.7261953741), (-11.9030987649, 27.065947721), (-13.7229076454, 28.1006093155)],
                knots=[0, 0, 0, 0, 0.5577901243, 1, 1, 1, 1], degree=3))
        make_face()
        with BuildLine():
            ThreePointArc((-17.7701736912, 43.7578842893), (-6.4142835546, 39.2859820381), (1.4229034066, 48.6418706156))
            ThreePointArc((1.4229034066, 48.6418706156), (1.4437368542, 49.022163574), (1.4506844192, 49.4029633877))
            ThreePointArc((1.4506844192, 49.4029633877), (-11.0750760863, 59.6317500163), (-18.5941676648, 45.3144173747))
            Line((-18.5941676648, 45.3144173747), (-17.7701736912, 43.7578842893))
        make_face()
        with BuildLine():
            ThreePointArc((-19.0243201626, 31.2025822021), (-19.348532067, 32.7274543218), (-20.2650786975, 33.9885215741))
            ThreePointArc((-20.2650786975, 33.9885215741), (-25.9011017814, 33.2664173148), (-24.3465941192, 27.8010996944))
            ThreePointArc((-24.3465941192, 27.8010996944), (-20.7539962478, 28.0443911329), (-19.0243201626, 31.2025822021))
        make_face()
        with BuildLine():
            ThreePointArc((-18.5941676648, 45.3144173747), (-18.215053705, 44.5187432893), (-17.7701736912, 43.7578842893))
            Line((-17.7701736912, 43.7578842893), (-18.5941676648, 45.3144173747))
        make_face()
        with BuildLine():
            ThreePointArc((-13.489631919, 16.81325586), (-16.49472285, 13.8773145827), (-18.8732484452, 10.4142323313))
            Line((-18.8732484452, 10.4142323313), (-13.489631919, 16.81325586))
        make_face()
        with BuildLine():
            Line((-9.4810400544, 19.3588641561), (-5.6219845653, 20.8098301644))
            ThreePointArc((-5.6219845653, 20.8098301644), (-7.5862812863, 20.1768203186), (-9.4810400544, 19.3588641561))
        make_face()
    extrude(amount=F1_DEPTH)

    # F2: fillet of radius 5.08 on 11 edges, made by hand

    # F2_s2 → F2_t1 (cut)
    with BuildSketch(Plane.XY.offset(-12.7)):
        with BuildLine():
            ThreePointArc((-23.7751875383, -33.607298423), (-20.0719299347, -34.7917486099), (-16.6157986116, -33.0106828051))
            Line((-16.6157986116, -33.0106828051), (-16.5382385661, -33.0763105382))
            Line((-16.5382385661, -33.0763105382), (-19.8852529537, -37.031872856))
            Line((-19.8852529537, -37.031872856), (-23.8408152714, -33.6848584684))
            Line((-23.8408152714, -33.6848584684), (-23.7751875383, -33.607298423))
        make_face()
    extrude(amount=F2_T1_DEPTH, mode=Mode.SUBTRACT)

    # F2_s4 → F2_t3 (cut)
    with BuildSketch(Plane.XY.offset(-14.1608009303)):
        with BuildLine():
            ThreePointArc((21.7041972204, -39.9499349296), (25.4860644305, -38.2616720075), (26.7542362913, -34.3190217034))
            Line((26.7542362913, -34.3190217034), (26.8552370727, -34.3080034389))
            Line((26.8552370727, -34.3080034389), (27.481804, -40.0515349296))
            Line((27.481804, -40.0515349296), (21.7041972204, -40.0515349296))
            Line((21.7041972204, -40.0515349296), (21.7041972204, -39.9499349296))
        make_face()
    extrude(amount=F2_T3_DEPTH, mode=Mode.SUBTRACT)

    # F2_s6 → F2_t5 (cut)
    with BuildSketch(Plane.XY.offset(-13.0469266463)):
        with BuildLine():
            ThreePointArc((31.3661757916, -4.8193364766), (31.3438624437, -0.8681884219), (28.4970258172, 1.8718097639))
            Line((28.4970258172, 1.8718097639), (28.5334665587, 1.9666497995))
            Line((28.5334665587, 1.9666497995), (33.5024366701, 0.0574038404))
            Line((33.5024366701, 0.0574038404), (31.4599995324, -4.8583193657))
            Line((31.4599995324, -4.8583193657), (31.3661757916, -4.8193364766))
        make_face()
    extrude(amount=F2_T5_DEPTH, mode=Mode.SUBTRACT)

    # F2_s8 → F2_t7 (cut)
    with BuildSketch(Plane.XY.offset(-8.9104425714)):
        with BuildLine():
            ThreePointArc((-28.2091730806, -25.465134965), (-28.3595555101, -28.5211629615), (-26.7274418769, -31.109236971))
            Line((-26.7274418769, -31.109236971), (-26.79306961, -31.1867970164))
            Line((-26.79306961, -31.1867970164), (-29.5683303084, -28.8384994191))
            Line((-29.5683303084, -28.8384994191), (-28.3044354378, -25.4298129704))
            Line((-28.3044354378, -25.4298129704), (-28.2091730806, -25.465134965))
        make_face()
    extrude(amount=F2_T7_DEPTH, mode=Mode.SUBTRACT)

    # F2_s10 → F2_t9 (cut)
    with BuildSketch(Plane.XY.offset(-9.8062075463)):
        with BuildLine():
            ThreePointArc((-27.4527909667, -5.0668295342), (-29.1173620778, -7.8934900279), (-28.7073500706, -11.1481323562))
            Line((-28.7073500706, -11.1481323562), (-28.7986544942, -11.1926976143))
            Line((-28.7986544942, -11.1926976143), (-30.5536013188, -7.5971971006))
            Line((-30.5536013188, -7.5971971006), (-27.5190042082, -4.9897687358))
            Line((-27.5190042082, -4.9897687358), (-27.4527909667, -5.0668295342))
        make_face()
    extrude(amount=F2_T9_DEPTH, mode=Mode.SUBTRACT)

    # F2_s12 → F2_t11 (join)
    with BuildSketch(Plane.XY):
        with BuildLine():
            ThreePointArc((-5.8876452816, -23.1164366785), (-8.0250450799, -23.587974668), (-9.7656475539, -24.915050024))
            Line((-9.7656475539, -24.915050024), (-9.8432075993, -24.8494222909))
            Line((-9.8432075993, -24.8494222909), (-8.2908658722, -23.0148366785))
            Line((-8.2908658722, -23.0148366785), (-5.8876452816, -23.0148366785))
            Line((-5.8876452816, -23.0148366785), (-5.8876452816, -23.1164366785))
        make_face()
        with BuildLine():
            ThreePointArc((8.9085458148, -24.6777973012), (7.2358985953, -23.523049896), (5.2444528939, -23.1164366785))
            Line((5.2444528939, -23.1164366785), (5.2444528939, -23.0148366785))
            Line((5.2444528939, -23.0148366785), (7.4524608177, -23.0148366785))
            Line((7.4524608177, -23.0148366785), (8.9818276732, -24.6074245137))
            Line((8.9818276732, -24.6074245137), (8.9085458148, -24.6777973012))
        make_face()
        with BuildLine():
            ThreePointArc((25.6646602449, -18.5417036265), (25.3273839394, -19.7690750319), (25.3058082185, -21.0417613096))
            Line((25.3058082185, -21.0417613096), (25.2048074371, -21.0527795742))
            Line((25.2048074371, -21.0527795742), (25.0605893352, -19.7307800018))
            Line((25.0605893352, -19.7307800018), (25.570836504, -18.5027207374))
            Line((25.570836504, -18.5027207374), (25.6646602449, -18.5417036265))
        make_face()
        with BuildLine():
            ThreePointArc((-26.1636731936, -19.9484832976), (-25.8530143, -17.9310084007), (-26.3615698708, -15.9541206601))
            Line((-26.3615698708, -15.9541206601), (-26.2702654472, -15.909555402))
            Line((-26.2702654472, -15.909555402), (-25.2970482589, -17.9034636227))
            Line((-25.2970482589, -17.9034636227), (-26.0684108365, -19.9838052922))
            Line((-26.0684108365, -19.9838052922), (-26.1636731936, -19.9484832976))
        make_face()
        with BuildLine():
            ThreePointArc((-26.2692397475, -4.049882339), (-24.531015773, -0.7582243213), (-25.5037302423, 2.834860934))
            Line((-25.5037302423, 2.834860934), (-25.4222068107, 2.8954950011))
            ThreePointArc((-25.4222068107, 2.8954950011), (-23.1778893513, 2.0067211174), (-21.468388576, 0.0516595226))
            Line((-21.468388576, 0.0516595226), (-21.4896616404, -0.0770607984))
            Line((-21.4896616404, -0.0770607984), (-26.2030265059, -4.1269431374))
            Line((-26.2030265059, -4.1269431374), (-26.2692397475, -4.049882339))
        make_face()
        with BuildLine():
            ThreePointArc((16.3256234208, -36.9395775477), (16.6779484431, -34.0075867675), (15.3399155285, -31.3750270292))
            Line((15.3399155285, -31.3750270292), (15.4131973869, -31.3046542417))
            Line((15.4131973869, -31.3046542417), (17.8153497528, -33.8061068018))
            Line((17.8153497528, -33.8061068018), (16.4186194371, -36.9804957705))
            Line((16.4186194371, -36.9804957705), (16.3256234208, -36.9395775477))
        make_face()
    extrude(amount=F2_T11_DEPTH)

    # F3: fillet of radius 5.08 on 1 edges, made by hand

    # F3_s2 → F3_t1 (cut)
    with BuildSketch(Plane.XY.offset(-16.75782565)):
        with BuildLine():
            ThreePointArc((21.7041972204, -39.9499349296), (18.2013107758, -38.4208506374), (16.7558106694, -34.882653122))
            Line((16.7558106694, -34.882653122), (16.2478118633, -34.8837544504))
            ThreePointArc((16.2478118633, -34.8837544504), (15.8606433395, -36.7349864336), (14.5360868791, -39.7453438155))
            Line((14.5360868791, -39.7453438155), (15.0010669604, -40.4579349296))
            ThreePointArc((15.0010669604, -40.4579349296), (18.3526320904, -40.4579349296), (21.6910370693, -40.4577644388))
            Line((21.6910370693, -40.4577644388), (21.7041972204, -39.9499349296))
        make_face()
    extrude(amount=F3_T1_DEPTH, mode=Mode.SUBTRACT)


solid = f1.part
